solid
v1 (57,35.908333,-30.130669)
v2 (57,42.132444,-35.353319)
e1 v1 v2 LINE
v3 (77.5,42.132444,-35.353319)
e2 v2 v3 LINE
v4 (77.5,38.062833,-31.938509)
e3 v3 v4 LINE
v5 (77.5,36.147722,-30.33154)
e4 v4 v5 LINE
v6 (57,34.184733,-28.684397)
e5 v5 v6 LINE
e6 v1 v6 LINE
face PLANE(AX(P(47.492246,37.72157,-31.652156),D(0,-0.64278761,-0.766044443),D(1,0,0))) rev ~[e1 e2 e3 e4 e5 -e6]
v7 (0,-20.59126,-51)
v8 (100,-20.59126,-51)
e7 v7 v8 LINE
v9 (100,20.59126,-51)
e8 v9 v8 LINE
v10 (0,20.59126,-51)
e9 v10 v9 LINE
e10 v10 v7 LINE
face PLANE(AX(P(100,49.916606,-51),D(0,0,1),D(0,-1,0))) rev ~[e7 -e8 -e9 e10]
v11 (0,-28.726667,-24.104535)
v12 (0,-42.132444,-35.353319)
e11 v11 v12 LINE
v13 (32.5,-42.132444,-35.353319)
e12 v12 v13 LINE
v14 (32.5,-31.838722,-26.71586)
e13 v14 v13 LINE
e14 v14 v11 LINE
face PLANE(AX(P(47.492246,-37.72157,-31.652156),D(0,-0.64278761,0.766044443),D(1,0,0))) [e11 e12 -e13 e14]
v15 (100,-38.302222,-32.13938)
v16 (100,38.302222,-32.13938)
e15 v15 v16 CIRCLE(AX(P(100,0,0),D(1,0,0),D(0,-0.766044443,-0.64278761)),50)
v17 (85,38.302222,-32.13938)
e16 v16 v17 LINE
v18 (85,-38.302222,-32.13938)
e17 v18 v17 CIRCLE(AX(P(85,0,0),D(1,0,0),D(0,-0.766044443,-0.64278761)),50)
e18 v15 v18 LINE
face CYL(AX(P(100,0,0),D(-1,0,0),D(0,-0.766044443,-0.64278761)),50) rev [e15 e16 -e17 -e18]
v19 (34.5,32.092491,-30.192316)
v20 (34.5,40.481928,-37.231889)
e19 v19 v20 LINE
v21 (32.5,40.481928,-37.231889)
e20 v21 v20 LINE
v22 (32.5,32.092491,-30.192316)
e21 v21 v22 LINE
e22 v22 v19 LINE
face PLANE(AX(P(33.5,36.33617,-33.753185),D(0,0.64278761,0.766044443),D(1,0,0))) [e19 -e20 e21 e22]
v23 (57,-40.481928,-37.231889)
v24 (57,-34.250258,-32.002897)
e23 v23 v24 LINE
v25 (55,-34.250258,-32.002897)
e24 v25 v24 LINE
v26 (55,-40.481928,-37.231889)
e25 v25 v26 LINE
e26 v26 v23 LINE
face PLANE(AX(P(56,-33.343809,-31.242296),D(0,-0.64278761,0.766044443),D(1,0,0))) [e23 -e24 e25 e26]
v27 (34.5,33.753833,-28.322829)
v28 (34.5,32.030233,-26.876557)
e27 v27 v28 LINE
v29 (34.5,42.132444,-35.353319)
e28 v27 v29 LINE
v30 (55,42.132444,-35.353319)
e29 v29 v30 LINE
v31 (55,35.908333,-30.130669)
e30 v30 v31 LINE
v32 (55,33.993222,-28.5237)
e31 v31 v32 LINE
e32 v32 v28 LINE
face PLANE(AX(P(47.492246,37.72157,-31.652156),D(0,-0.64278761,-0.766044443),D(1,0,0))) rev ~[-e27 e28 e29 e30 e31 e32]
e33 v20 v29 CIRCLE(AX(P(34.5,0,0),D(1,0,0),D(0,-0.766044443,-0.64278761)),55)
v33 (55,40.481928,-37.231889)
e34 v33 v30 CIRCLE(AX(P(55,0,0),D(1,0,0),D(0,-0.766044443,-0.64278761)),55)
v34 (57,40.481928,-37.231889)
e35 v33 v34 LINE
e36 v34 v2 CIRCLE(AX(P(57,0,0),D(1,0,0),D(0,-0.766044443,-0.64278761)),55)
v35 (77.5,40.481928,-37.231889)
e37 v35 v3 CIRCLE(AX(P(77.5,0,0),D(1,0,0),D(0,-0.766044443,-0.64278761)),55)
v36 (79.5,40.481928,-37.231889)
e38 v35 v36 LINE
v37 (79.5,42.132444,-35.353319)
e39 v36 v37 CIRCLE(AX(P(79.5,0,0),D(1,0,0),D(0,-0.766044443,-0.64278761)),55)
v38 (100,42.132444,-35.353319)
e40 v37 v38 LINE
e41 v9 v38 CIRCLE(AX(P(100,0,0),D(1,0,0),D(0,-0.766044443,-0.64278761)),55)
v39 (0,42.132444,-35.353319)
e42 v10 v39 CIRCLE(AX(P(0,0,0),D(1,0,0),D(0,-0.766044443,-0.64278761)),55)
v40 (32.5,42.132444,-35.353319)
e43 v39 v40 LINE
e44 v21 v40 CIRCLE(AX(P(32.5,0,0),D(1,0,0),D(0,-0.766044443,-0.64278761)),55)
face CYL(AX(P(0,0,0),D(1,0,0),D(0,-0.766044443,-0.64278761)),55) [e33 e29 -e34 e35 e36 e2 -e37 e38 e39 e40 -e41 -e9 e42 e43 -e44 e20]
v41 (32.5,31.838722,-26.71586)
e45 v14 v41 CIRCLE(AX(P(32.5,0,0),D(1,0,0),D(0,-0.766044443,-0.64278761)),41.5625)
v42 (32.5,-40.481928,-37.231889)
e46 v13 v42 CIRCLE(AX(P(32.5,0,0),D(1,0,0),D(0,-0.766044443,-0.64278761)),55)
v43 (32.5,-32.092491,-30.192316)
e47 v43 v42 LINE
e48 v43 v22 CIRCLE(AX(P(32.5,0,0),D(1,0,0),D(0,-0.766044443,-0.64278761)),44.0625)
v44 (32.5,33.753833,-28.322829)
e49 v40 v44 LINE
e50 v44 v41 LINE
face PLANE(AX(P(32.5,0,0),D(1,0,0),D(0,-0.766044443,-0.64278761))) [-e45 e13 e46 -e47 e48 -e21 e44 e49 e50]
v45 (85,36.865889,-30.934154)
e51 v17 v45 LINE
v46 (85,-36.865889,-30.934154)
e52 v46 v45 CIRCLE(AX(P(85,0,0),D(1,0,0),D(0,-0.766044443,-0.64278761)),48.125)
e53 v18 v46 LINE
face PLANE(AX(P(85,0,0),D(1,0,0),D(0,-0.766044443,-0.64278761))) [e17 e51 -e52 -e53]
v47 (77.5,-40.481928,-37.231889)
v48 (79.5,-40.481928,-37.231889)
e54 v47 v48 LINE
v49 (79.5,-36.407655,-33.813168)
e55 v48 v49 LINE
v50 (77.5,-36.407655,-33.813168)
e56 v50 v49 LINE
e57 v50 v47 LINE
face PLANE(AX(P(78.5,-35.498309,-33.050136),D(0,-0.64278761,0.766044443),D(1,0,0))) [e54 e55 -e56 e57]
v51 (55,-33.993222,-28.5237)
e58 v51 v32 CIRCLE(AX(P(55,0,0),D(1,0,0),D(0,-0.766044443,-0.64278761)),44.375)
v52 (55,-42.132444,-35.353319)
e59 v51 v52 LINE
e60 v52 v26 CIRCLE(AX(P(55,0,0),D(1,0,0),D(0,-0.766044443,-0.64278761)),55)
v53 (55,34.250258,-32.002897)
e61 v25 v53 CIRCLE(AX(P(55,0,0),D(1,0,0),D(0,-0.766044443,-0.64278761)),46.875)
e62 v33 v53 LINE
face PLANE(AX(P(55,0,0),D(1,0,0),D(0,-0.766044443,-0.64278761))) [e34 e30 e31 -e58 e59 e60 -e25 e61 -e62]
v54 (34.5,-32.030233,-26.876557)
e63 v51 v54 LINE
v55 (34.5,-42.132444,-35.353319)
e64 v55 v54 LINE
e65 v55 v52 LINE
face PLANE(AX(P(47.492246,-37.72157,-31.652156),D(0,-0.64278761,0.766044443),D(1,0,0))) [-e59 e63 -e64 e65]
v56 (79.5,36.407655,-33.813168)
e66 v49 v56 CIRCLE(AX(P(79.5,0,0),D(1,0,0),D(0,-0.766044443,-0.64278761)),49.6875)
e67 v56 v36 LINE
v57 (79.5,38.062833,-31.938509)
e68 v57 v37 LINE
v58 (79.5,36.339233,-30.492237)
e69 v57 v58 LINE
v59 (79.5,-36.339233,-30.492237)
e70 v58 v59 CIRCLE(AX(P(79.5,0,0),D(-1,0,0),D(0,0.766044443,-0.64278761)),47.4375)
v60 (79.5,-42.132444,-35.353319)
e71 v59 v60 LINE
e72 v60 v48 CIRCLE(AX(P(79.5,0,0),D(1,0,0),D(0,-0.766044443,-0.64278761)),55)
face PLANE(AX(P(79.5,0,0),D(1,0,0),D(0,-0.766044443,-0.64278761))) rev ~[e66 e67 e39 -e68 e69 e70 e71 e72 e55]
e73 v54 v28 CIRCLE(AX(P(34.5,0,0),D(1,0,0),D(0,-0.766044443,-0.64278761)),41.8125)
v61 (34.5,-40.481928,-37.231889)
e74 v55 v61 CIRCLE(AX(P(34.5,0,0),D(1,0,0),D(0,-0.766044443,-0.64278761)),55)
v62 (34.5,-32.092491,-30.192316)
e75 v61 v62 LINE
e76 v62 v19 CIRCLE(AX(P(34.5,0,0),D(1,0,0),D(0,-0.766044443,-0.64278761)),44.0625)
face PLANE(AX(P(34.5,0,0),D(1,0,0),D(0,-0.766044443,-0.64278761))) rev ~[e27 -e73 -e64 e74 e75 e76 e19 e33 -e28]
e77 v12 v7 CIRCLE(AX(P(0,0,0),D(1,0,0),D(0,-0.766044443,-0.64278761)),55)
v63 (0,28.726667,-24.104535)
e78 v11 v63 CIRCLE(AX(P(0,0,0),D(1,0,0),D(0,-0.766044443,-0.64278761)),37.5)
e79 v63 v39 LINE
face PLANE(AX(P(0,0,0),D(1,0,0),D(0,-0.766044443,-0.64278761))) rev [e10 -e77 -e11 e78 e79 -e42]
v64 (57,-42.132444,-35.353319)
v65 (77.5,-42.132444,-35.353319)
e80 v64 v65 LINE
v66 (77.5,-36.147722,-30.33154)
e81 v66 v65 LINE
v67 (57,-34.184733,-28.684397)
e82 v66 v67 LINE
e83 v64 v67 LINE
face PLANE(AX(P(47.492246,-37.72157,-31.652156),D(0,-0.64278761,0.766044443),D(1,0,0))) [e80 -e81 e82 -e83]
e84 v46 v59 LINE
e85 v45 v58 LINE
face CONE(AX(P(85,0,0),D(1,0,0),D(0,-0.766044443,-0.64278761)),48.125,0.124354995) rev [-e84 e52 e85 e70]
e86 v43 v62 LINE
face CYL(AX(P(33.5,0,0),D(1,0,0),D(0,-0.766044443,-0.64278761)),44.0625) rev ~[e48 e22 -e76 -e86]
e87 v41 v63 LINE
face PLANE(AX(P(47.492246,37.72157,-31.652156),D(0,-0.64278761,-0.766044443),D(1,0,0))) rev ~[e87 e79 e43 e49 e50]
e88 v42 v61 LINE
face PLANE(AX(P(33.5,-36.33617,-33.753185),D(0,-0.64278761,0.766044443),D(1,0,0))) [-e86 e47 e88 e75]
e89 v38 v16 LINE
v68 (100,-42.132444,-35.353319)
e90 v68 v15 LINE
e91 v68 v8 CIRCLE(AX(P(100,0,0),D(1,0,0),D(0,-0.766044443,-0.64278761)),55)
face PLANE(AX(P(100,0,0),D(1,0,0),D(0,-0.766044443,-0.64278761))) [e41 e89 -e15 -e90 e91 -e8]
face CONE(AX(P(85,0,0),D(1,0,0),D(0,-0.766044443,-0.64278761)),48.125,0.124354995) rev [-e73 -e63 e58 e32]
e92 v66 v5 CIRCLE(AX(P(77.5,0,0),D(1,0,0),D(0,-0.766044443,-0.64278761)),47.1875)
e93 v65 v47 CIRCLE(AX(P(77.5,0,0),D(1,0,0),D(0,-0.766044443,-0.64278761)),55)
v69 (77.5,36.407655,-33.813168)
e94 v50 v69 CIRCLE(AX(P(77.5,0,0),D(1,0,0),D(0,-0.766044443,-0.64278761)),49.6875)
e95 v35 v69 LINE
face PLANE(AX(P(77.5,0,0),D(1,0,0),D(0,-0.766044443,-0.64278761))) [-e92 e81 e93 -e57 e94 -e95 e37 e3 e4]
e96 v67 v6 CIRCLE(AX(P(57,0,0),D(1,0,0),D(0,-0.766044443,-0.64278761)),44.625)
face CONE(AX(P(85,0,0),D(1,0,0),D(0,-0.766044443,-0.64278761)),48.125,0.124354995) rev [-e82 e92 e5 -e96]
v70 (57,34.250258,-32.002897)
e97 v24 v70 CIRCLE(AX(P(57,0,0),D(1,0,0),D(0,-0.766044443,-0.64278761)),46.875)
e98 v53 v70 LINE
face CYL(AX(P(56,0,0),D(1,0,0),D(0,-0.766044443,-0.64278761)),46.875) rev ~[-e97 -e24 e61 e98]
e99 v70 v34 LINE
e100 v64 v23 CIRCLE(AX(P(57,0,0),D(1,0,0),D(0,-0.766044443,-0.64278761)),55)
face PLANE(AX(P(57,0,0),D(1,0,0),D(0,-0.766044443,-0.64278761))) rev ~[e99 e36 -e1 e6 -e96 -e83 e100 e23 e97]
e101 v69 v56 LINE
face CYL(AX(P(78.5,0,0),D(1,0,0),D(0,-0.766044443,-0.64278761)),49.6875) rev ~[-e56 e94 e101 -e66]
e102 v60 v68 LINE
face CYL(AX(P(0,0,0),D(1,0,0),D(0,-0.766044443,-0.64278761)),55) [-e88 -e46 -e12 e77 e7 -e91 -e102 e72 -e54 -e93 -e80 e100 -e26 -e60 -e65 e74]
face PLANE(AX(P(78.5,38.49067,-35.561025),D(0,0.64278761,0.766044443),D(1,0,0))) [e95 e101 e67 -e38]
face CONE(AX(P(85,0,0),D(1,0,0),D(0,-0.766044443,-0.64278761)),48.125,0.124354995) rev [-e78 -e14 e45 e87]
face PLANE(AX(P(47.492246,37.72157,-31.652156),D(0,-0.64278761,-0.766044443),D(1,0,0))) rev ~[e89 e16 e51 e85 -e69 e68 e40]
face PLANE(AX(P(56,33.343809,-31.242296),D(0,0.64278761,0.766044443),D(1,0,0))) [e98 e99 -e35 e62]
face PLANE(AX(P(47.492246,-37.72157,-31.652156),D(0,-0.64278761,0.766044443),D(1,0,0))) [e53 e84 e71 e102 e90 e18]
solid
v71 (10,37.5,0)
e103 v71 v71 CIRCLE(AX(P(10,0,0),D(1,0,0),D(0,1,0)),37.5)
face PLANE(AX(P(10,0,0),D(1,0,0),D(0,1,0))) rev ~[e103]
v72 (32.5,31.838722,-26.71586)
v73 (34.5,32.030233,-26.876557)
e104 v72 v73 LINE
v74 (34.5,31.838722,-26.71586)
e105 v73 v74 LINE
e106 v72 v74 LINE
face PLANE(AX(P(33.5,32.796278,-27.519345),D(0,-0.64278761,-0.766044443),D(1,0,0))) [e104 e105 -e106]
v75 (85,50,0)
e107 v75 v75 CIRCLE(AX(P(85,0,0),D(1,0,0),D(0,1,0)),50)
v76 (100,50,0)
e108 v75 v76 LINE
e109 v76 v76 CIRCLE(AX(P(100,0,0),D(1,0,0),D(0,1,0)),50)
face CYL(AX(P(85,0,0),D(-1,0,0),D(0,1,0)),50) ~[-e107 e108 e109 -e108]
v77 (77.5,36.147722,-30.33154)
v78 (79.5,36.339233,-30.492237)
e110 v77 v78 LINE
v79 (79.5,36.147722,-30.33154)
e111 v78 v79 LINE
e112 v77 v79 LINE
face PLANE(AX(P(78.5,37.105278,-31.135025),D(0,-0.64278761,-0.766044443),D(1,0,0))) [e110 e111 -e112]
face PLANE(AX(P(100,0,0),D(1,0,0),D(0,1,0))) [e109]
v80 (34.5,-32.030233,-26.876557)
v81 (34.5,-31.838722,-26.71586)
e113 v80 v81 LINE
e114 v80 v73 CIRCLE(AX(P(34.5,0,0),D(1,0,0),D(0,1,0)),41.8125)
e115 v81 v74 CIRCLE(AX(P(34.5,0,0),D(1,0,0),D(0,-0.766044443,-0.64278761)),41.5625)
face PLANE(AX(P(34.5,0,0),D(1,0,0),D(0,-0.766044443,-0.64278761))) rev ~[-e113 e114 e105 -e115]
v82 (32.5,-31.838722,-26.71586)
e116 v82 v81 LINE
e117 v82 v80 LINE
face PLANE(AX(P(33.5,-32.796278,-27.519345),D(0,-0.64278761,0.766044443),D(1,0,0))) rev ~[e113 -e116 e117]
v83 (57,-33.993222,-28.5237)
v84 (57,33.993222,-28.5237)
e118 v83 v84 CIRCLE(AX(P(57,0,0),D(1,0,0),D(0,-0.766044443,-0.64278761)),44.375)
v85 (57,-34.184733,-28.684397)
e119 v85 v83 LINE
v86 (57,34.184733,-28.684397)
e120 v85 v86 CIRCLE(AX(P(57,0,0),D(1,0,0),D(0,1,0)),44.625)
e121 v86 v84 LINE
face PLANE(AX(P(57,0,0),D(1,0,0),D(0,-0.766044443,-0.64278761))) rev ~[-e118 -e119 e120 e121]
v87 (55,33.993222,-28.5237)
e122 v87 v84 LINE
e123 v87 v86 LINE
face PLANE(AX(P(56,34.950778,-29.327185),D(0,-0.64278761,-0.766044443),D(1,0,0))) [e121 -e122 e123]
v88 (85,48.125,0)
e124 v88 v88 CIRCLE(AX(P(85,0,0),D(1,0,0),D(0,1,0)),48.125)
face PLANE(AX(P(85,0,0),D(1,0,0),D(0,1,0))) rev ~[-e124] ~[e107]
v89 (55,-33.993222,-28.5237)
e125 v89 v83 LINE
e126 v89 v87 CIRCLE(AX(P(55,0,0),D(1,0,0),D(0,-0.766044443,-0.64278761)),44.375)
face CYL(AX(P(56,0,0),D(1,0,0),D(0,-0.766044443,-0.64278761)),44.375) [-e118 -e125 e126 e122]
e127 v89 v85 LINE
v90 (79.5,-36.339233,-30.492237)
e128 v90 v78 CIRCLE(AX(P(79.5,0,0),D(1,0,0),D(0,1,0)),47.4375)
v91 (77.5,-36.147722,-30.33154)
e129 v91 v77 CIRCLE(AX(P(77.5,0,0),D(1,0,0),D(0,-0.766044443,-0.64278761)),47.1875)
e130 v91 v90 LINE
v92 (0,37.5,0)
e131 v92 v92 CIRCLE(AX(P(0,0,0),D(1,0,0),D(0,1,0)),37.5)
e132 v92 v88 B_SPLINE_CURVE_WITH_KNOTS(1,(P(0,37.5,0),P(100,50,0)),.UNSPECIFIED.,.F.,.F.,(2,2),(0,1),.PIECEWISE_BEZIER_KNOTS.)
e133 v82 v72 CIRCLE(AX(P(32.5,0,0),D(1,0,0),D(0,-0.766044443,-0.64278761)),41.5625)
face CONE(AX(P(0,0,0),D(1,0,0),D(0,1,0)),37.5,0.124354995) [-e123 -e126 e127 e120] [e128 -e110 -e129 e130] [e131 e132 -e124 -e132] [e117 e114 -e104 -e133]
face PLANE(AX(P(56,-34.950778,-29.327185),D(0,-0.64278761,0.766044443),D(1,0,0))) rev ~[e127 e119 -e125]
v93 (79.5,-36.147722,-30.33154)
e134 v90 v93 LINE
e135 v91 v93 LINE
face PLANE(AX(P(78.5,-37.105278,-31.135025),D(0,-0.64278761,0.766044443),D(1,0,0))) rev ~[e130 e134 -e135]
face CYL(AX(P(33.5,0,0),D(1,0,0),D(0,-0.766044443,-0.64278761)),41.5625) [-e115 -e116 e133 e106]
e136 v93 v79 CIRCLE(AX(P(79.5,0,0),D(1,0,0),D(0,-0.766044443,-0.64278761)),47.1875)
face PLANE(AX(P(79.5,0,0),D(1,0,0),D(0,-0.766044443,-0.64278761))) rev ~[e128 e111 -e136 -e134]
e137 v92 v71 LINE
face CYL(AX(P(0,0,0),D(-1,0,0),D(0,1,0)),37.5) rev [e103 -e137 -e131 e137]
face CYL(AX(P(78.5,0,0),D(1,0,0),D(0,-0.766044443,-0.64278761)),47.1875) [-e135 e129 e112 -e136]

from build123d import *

# Parameters (mm, degrees)
F0_R          = 37.5
F2_R          = 50
F4_R          = 50
F6_DEPTH      = 15
F7_DEPTH      = 10
F9_ANGLE_BACK = 50
F9_ANGLE      = 100
F10_W         = 2
F10_H         = 2.5
F11_ANGLE     = 100
F13_DEPTH     = 100
F14_W         = 2
F14_H         = 10.9375
F14_H_2       = 8.125
F14_H_3       = 5.3125
F15_DEPTH     = 2.5
F16_W         = 2
F16_H         = 5.3125
F16_H_2       = 8.125
F16_H_3       = 10.9375
F17_DEPTH     = 2.5


# Not quite as in the source:
# - a feature names something its author has since deleted; it is built from what else it names


with BuildPart() as f5:
    # F0 (on Right) → F5 section 0
    with BuildSketch(Plane.YZ):
        Circle(F0_R)
    # F2 (on offset) → F5 section 1
    with BuildSketch(Plane.YZ.offset(100)):
        Circle(F2_R)
    loft()

    # F4 (on offset) → F6 (join, through all)
    with BuildSketch(Plane.YZ.offset(85)):
        Circle(F4_R)
    extrude(amount=F6_DEPTH)

    # F7 (cut): a face of the model
    f7_faces = [f5.faces().sort_by_distance(p)[0] for p in [
        (0, 0, 0),
    ]]
    extrude(f7_faces, amount=-F7_DEPTH, mode=Mode.SUBTRACT)


with BuildPart() as f9:
    # F8 (on Front) → F9 (revolve)
    with BuildSketch(Plane.XZ, mode=Mode.PRIVATE) as f9_sk:
        Polygon((85, -50), (85, -48.125), (0, -37.5), (0, -55), (100, -55), (100, -50), align=None)
    revolve(f9_sk.sketch.rotate(Axis((53.7593327463, 0, 0), (1, 0, 0)), -F9_ANGLE_BACK), axis=Axis((53.7593327463, 0, 0), (1, 0, 0)), revolution_arc=F9_ANGLE)


with BuildPart() as f11_tool:
    # F10 (on face) → F11 (revolve)
    with BuildSketch(Plane(origin=(0, 0, 0), x_dir=(1, 0, 0), z_dir=(0, -0.6427876097, 0.7660444431))):
        with Locations((33.5, -42.8125)):
            Rectangle(F10_W, F10_H)
        with Locations((56, -45.625)):
            Rectangle(F10_W, F10_H)
        with Locations((78.5, -48.4375)):
            Rectangle(F10_W, F10_H)
    revolve(axis=Axis((53.7593327463, 0, 0), (1, 0, 0)), revolution_arc=F11_ANGLE)


with BuildPart() as f5_1:
    add(f5.part)

    # F11: cut by f11_tool
    add(f11_tool.part, mode=Mode.SUBTRACT)


with BuildPart() as f9_1:
    add(f9.part)

    # F11: cut by f11_tool
    add(f11_tool.part, mode=Mode.SUBTRACT)

    # F12 (on face) → F13 (cut, through all)
    with BuildSketch(Plane.YZ.offset(100)):
        with BuildLine():
            Line((-20.591260282, -51), (-50.5514740944, -51))
            Line((-50.5514740944, -51), (-50.5514740944, -60.0057376325))
            Line((-50.5514740944, -60.0057376325), (49.9166063964, -60.0057376325))
            Line((49.9166063964, -60.0057376325), (49.9166063964, -51))
            Line((49.9166063964, -51), (20.591260282, -51))
            ThreePointArc((20.591260282, -51), (0, -55), (-20.591260282, -51))
        make_face()
        with BuildLine():
            Line((20.591260282, -51), (-20.591260282, -51))
            ThreePointArc((-20.591260282, -51), (0, -55), (20.591260282, -51))
        make_face()
    extrude(amount=-F13_DEPTH, mode=Mode.SUBTRACT)

    # F14 (on face) → F15 (cut)
    with BuildSketch(Plane(origin=(0, 0, 0), x_dir=(1, 0, 0), z_dir=(0, -0.6427876097, 0.7660444431))):
        with Locations((33.5, -49.53125)):
            Rectangle(F14_W, F14_H)
        Polygon((34.5, -41.5625), (32.5, -41.5625), (32.5, -44.0625), (34.5, -44.0625), (34.5, -41.8125), align=None)
        Polygon((57, -44.375), (55, -44.375), (55, -46.875), (57, -46.875), (57, -44.625), align=None)
        with Locations((56, -50.9375)):
            Rectangle(F14_W, F14_H_2)
        Polygon((79.5, -47.1875), (77.5, -47.1875), (77.5, -49.6875), (79.5, -49.6875), (79.5, -47.4375), align=None)
        with Locations((78.5, -52.34375)):
            Rectangle(F14_W, F14_H_3)
    extrude(amount=-F15_DEPTH, mode=Mode.SUBTRACT)

    # F16 (on face) → F17 (cut)
    with BuildSketch(Plane(origin=(0, 0, 0), x_dir=(1, 0, 0), z_dir=(0, 0.6427876097, 0.7660444431))):
        with Locations((78.5, 52.34375)):
            Rectangle(F16_W, F16_H)
        Polygon((77.5, 49.6875), (77.5, 47.1875), (79.5, 47.1875), (79.5, 47.4375), (79.5, 49.6875), align=None)
        Polygon((55, 46.875), (55, 44.375), (57, 44.375), (57, 44.625), (57, 46.875), align=None)
        with Locations((56, 50.9375)):
            Rectangle(F16_W, F16_H_2)
        with Locations((33.5, 49.53125)):
            Rectangle(F16_W, F16_H_3)
        Polygon((32.5, 44.0625), (32.5, 41.5625), (34.5, 41.5625), (34.5, 41.8125), (34.5, 44.0625), align=None)
    extrude(amount=-F17_DEPTH, mode=Mode.SUBTRACT)


solid = Compound([f5_1.part, f9_1.part])
